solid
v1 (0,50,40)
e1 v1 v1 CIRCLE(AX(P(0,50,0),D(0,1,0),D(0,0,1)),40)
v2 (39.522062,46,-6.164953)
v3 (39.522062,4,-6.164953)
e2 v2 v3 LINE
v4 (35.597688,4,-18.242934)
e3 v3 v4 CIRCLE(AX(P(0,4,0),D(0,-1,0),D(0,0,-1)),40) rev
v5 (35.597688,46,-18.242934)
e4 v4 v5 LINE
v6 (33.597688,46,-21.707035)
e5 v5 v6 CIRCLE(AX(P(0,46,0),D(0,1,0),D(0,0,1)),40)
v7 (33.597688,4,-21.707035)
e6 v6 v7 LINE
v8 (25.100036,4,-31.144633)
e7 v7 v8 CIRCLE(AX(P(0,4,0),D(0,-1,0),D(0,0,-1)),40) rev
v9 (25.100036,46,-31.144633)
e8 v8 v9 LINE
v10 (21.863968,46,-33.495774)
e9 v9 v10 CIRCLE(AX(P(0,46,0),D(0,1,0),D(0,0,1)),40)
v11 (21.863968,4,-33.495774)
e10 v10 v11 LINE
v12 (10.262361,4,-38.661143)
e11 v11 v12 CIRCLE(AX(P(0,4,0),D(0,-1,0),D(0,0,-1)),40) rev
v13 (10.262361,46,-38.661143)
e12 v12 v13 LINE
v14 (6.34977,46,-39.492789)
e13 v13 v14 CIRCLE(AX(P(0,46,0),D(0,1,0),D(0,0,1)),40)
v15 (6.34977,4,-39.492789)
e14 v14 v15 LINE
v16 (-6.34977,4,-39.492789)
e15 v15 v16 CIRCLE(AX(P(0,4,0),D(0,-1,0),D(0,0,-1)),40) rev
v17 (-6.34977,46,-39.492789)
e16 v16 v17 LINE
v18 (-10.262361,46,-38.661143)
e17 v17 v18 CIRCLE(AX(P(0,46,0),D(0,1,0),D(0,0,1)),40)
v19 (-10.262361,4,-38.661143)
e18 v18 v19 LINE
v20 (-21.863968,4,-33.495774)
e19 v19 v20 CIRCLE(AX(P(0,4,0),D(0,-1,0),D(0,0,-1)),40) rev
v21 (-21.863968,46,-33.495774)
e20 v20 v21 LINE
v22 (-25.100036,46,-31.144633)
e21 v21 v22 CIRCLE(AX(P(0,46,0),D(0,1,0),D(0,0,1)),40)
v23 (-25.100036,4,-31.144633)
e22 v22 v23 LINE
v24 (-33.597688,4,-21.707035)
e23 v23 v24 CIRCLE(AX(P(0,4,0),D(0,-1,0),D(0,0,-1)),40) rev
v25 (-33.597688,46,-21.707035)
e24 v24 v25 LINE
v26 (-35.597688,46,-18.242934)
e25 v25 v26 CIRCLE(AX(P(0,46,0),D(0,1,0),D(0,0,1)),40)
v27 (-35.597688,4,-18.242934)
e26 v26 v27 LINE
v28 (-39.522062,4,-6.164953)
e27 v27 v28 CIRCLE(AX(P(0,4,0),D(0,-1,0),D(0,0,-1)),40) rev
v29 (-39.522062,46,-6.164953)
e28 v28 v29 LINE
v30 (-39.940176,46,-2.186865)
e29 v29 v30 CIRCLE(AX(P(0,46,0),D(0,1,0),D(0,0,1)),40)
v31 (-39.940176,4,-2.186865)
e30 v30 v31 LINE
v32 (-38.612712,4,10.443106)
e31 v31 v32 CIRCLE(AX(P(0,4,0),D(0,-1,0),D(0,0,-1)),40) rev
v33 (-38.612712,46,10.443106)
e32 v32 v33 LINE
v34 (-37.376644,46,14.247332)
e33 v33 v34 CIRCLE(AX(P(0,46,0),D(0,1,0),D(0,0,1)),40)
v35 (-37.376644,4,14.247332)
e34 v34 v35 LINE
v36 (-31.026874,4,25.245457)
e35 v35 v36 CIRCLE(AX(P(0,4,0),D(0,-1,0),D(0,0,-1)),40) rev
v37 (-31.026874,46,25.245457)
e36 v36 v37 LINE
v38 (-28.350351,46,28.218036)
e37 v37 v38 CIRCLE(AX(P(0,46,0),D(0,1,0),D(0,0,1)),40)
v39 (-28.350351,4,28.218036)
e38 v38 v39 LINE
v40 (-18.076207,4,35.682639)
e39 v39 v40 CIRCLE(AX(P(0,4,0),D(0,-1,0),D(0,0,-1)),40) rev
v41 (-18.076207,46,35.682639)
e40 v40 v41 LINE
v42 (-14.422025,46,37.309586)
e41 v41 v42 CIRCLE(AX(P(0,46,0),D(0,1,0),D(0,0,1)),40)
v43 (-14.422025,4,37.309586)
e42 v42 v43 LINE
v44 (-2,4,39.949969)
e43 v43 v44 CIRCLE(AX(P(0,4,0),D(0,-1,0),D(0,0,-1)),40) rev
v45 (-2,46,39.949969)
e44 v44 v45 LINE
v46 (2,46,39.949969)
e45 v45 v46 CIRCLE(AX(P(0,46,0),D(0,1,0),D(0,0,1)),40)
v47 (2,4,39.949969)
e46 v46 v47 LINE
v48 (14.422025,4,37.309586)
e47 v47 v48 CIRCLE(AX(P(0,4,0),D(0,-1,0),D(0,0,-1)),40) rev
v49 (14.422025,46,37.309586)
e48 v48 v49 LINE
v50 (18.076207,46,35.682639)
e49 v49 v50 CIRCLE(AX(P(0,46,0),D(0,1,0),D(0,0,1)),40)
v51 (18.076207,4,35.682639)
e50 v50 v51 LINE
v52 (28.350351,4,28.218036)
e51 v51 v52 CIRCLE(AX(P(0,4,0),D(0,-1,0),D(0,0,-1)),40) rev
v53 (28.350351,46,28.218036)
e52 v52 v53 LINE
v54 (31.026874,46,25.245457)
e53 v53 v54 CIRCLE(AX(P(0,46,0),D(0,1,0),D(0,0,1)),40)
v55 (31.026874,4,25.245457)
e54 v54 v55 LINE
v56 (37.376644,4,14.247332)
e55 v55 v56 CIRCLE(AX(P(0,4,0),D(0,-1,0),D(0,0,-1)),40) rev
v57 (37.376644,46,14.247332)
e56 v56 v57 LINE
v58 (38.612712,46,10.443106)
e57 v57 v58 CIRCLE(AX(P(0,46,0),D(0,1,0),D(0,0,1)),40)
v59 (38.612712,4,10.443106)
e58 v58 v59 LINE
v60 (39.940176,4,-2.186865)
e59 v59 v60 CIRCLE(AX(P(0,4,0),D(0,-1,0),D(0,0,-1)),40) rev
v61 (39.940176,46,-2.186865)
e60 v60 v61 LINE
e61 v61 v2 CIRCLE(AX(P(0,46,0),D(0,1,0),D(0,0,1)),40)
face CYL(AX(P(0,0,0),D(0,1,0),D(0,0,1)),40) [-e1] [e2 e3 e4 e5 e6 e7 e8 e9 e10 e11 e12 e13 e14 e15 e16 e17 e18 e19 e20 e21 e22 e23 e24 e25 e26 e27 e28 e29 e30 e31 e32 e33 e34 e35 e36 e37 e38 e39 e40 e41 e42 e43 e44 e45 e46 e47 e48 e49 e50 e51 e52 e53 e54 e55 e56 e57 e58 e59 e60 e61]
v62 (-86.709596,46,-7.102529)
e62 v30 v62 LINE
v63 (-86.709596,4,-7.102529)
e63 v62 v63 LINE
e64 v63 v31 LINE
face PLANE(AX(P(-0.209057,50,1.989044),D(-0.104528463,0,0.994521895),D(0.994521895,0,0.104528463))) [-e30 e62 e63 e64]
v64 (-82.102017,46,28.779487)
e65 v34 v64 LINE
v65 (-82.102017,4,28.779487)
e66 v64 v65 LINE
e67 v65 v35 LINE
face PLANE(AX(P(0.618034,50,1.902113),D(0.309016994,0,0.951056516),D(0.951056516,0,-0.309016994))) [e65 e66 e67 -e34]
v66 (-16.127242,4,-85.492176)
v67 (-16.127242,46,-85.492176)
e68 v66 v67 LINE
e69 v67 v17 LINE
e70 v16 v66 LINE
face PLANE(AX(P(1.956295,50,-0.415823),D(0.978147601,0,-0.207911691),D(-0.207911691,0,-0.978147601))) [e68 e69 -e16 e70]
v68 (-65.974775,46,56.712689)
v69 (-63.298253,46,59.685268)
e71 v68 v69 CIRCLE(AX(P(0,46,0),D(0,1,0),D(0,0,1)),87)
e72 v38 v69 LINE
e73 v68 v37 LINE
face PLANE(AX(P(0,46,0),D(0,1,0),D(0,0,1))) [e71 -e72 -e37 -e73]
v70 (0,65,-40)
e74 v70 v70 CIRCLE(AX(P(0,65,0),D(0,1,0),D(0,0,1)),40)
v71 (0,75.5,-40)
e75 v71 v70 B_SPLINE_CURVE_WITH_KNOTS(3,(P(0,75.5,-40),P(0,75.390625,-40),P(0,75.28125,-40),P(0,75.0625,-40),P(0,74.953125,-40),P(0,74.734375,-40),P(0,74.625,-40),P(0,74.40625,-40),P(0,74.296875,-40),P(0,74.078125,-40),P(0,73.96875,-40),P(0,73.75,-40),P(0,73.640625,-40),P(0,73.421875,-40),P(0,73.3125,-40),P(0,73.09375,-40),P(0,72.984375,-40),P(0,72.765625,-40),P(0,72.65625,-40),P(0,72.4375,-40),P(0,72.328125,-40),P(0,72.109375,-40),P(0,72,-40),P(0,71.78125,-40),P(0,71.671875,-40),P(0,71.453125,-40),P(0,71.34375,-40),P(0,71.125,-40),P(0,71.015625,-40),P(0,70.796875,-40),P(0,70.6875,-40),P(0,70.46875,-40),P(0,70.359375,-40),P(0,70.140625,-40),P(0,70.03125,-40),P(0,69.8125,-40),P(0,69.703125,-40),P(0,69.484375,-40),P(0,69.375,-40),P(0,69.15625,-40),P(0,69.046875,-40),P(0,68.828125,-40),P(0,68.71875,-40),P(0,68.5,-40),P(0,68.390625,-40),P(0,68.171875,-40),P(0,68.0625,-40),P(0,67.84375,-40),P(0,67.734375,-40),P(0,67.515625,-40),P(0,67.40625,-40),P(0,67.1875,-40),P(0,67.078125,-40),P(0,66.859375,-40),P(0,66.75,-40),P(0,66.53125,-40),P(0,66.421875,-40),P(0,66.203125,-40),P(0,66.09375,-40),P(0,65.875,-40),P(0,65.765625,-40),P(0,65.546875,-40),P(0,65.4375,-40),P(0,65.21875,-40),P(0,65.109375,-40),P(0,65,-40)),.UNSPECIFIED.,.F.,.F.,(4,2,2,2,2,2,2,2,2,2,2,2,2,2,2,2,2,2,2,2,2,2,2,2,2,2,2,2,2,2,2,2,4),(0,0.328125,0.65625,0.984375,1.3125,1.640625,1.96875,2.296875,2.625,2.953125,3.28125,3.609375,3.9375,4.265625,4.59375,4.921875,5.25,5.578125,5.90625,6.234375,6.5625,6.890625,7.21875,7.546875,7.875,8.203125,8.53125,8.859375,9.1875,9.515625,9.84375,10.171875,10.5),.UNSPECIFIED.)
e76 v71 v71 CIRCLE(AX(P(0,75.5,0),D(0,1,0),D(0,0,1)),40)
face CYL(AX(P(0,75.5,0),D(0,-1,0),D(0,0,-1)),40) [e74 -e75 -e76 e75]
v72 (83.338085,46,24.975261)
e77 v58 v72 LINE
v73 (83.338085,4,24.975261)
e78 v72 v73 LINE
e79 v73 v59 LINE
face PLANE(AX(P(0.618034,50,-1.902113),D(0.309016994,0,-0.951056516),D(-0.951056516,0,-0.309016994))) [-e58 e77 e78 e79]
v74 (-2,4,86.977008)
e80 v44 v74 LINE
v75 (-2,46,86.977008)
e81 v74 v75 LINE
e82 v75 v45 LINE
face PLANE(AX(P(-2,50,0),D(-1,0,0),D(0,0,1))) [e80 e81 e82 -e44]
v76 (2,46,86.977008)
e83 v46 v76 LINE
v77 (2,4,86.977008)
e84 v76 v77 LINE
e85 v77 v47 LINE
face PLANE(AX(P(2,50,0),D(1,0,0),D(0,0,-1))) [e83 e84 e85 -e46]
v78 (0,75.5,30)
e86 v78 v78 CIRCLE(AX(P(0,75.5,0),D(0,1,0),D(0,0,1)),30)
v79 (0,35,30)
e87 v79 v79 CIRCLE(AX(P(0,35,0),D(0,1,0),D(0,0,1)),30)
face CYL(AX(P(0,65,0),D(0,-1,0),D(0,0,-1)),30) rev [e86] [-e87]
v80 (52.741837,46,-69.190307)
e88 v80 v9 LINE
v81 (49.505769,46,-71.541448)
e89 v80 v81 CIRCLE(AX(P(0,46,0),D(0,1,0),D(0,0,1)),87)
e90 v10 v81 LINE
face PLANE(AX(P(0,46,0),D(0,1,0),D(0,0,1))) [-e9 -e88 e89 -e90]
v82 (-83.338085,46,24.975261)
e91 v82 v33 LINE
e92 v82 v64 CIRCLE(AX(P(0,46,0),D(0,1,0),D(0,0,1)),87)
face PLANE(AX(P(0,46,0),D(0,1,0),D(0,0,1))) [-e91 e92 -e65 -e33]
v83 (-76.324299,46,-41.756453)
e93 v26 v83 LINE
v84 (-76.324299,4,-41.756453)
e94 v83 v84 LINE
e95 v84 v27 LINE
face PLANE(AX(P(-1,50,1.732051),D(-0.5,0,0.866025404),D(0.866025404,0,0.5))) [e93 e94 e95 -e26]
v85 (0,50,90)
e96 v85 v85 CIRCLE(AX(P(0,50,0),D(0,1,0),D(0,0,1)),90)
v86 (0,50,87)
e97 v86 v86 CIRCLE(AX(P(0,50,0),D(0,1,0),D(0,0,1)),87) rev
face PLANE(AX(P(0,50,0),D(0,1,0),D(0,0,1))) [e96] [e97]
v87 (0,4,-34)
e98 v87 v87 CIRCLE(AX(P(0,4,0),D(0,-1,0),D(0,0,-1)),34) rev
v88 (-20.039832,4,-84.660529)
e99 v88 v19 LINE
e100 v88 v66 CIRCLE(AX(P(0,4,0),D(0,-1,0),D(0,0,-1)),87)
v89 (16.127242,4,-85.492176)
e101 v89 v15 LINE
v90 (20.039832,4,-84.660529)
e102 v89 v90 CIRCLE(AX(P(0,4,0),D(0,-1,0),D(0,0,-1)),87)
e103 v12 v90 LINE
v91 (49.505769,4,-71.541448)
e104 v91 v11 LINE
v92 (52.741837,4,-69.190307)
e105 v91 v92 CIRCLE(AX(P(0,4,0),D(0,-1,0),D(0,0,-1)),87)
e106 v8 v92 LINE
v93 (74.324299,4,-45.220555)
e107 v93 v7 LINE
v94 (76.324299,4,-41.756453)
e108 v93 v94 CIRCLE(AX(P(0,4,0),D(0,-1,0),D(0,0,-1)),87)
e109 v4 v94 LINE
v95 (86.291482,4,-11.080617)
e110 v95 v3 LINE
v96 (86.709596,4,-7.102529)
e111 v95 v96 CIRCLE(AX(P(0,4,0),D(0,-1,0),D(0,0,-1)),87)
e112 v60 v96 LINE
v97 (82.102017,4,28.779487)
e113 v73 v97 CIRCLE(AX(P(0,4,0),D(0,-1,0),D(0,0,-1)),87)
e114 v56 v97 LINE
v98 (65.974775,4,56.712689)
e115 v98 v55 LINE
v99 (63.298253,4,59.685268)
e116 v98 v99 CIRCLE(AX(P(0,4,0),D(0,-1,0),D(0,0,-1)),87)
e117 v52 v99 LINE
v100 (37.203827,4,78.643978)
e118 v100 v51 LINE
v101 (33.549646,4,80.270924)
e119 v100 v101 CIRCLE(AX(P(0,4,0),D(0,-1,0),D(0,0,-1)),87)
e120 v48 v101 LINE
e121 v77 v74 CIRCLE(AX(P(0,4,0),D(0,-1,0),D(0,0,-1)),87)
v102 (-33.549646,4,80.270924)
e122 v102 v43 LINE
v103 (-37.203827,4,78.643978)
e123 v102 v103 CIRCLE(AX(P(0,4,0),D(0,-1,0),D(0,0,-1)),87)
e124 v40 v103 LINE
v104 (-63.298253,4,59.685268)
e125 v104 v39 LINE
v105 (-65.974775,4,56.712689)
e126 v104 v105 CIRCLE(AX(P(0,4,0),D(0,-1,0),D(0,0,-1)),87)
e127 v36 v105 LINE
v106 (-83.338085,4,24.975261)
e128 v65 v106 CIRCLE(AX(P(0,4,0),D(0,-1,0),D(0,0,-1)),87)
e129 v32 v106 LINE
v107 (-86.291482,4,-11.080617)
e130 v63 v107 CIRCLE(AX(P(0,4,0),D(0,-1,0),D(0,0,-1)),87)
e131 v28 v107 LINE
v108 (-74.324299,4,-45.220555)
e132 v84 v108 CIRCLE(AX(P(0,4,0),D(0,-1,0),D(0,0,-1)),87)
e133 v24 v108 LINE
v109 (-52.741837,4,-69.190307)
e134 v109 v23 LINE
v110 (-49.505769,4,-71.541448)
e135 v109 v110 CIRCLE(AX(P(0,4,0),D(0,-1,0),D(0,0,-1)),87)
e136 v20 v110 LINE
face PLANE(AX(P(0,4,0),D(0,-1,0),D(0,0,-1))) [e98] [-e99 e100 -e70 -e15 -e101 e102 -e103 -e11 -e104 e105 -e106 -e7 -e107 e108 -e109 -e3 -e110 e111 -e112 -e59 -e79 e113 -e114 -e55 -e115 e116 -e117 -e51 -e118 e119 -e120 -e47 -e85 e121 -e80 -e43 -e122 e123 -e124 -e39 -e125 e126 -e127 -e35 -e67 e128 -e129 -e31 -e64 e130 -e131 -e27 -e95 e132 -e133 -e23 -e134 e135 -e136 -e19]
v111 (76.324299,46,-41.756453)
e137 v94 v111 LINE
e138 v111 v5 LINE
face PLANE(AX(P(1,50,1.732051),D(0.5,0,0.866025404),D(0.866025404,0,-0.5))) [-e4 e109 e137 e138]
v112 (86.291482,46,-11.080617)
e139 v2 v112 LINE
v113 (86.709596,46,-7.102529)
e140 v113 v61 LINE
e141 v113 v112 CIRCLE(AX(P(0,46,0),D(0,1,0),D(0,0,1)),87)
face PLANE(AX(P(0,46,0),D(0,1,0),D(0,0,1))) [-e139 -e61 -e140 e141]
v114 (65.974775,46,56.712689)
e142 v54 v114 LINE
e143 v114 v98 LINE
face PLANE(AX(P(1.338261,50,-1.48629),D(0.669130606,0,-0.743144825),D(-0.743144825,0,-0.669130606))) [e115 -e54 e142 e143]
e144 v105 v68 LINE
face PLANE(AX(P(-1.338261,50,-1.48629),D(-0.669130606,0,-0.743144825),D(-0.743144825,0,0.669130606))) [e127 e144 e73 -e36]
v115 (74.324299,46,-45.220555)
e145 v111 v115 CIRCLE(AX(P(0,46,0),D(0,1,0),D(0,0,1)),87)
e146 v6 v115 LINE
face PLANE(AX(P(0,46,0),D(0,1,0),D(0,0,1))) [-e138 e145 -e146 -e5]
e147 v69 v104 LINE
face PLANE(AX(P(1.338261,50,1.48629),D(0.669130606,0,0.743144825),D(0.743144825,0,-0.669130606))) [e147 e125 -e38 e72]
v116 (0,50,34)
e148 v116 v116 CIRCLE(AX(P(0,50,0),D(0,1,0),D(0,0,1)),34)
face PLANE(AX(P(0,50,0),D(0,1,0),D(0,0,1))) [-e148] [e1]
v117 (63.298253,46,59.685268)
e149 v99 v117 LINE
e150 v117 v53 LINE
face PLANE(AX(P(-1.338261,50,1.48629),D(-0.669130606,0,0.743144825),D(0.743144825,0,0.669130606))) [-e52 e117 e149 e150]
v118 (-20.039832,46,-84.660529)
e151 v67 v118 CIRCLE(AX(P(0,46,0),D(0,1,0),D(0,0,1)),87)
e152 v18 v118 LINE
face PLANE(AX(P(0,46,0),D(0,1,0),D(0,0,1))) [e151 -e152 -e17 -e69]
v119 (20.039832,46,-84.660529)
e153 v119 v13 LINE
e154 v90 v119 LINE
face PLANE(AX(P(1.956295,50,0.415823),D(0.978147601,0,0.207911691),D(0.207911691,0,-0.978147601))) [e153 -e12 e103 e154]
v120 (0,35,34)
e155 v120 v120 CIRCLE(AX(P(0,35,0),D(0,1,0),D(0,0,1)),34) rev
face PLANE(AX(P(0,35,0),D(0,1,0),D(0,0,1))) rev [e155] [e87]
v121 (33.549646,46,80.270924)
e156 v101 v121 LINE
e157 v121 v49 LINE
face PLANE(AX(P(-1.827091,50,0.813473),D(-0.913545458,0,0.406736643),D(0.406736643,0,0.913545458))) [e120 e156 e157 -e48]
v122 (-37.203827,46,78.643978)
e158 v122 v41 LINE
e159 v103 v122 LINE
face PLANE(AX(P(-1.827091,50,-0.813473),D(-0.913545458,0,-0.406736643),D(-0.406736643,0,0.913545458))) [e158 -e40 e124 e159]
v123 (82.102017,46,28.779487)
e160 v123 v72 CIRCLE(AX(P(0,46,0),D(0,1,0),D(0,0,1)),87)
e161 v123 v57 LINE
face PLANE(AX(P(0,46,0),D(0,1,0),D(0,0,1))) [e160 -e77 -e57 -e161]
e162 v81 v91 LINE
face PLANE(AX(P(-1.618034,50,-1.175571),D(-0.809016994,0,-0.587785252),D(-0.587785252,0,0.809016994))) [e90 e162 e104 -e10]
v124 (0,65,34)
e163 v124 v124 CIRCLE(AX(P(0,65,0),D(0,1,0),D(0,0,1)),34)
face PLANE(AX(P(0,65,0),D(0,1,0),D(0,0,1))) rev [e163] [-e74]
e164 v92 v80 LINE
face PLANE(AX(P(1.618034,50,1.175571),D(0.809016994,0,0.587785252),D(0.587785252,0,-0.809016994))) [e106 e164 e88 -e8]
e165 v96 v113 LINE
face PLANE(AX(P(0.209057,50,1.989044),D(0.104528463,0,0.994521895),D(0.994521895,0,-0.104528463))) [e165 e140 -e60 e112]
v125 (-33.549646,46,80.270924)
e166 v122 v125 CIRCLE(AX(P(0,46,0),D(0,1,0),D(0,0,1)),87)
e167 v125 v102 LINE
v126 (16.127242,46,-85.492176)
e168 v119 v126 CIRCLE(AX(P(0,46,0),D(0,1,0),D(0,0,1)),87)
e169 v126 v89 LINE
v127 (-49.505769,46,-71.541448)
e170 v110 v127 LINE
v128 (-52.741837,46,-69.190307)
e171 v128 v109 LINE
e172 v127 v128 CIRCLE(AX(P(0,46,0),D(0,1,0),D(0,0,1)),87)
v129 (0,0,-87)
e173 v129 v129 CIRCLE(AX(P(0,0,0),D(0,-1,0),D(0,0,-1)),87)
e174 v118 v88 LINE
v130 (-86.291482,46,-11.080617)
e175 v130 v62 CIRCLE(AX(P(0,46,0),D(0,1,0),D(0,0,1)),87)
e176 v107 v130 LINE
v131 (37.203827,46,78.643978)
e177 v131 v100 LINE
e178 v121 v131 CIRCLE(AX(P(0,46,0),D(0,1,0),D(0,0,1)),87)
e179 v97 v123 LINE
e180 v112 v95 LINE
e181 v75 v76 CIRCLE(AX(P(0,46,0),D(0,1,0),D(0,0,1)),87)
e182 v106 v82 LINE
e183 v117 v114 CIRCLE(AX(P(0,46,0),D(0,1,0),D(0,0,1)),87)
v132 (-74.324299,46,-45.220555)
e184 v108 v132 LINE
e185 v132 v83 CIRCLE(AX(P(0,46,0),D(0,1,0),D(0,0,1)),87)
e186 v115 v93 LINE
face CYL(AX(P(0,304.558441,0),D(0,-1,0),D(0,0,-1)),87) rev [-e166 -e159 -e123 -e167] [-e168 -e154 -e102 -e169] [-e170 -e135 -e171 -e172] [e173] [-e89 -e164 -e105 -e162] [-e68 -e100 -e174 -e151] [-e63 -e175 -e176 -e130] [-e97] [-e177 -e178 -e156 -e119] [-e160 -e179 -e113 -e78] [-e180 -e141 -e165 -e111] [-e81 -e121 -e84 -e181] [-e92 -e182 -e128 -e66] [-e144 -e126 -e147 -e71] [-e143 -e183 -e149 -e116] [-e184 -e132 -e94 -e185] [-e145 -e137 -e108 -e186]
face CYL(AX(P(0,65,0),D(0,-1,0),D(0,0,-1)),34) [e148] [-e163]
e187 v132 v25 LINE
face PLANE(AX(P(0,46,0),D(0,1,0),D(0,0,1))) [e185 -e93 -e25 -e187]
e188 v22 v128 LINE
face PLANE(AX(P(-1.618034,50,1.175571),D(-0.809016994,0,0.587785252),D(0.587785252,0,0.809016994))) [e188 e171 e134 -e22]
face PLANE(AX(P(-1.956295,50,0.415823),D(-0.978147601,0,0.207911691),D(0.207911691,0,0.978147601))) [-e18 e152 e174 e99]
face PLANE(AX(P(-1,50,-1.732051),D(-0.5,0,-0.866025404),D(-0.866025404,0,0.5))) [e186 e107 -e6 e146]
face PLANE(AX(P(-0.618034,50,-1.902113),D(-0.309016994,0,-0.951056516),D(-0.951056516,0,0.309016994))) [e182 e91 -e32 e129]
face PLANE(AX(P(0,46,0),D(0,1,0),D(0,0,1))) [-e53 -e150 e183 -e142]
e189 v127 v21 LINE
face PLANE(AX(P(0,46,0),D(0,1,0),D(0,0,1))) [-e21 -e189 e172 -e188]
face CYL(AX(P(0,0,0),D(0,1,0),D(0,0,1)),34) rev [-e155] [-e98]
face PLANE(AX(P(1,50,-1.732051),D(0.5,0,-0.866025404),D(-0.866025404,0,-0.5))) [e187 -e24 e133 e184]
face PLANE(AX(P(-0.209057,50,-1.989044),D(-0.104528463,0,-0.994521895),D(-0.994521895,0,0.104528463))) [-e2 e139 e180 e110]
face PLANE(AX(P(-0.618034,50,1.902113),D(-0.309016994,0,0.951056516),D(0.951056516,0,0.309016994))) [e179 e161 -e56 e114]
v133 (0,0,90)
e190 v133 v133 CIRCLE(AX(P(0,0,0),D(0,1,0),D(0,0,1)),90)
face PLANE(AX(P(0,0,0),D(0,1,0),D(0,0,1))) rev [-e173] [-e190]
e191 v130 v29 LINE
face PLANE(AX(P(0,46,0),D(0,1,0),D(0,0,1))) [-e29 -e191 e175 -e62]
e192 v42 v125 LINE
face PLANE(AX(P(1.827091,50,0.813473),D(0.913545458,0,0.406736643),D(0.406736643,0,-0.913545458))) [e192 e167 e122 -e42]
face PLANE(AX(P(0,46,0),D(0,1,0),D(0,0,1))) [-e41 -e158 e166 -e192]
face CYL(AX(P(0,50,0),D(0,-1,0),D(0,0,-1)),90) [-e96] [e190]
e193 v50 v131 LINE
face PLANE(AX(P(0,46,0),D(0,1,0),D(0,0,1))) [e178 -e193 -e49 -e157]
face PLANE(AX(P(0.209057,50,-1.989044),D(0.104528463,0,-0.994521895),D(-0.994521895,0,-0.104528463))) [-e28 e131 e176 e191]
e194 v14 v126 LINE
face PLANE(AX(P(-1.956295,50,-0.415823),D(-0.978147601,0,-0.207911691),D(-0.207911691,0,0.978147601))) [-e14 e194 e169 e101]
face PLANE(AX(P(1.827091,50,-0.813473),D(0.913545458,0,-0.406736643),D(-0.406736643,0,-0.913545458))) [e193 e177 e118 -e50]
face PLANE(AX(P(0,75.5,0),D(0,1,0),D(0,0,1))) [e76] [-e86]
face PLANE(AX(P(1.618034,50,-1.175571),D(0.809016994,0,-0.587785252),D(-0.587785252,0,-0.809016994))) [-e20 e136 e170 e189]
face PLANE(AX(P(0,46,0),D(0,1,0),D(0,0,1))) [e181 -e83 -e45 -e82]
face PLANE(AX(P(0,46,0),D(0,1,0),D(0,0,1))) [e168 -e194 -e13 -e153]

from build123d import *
from build123d.topology import SkipClean

# Parameters (mm, degrees)
SKETCH1_R                = 90
BOSS_EXTRUDE1_DEPTH      = 50
CUT_EXTRUDE1_DEPTH       = 50
SKETCH4_R                = 40
CUT_EXTRUDE2_DEPTH       = 137.546695512
SKETCH5_R                = 40
SKETCH5_R_2              = 34
BOSS_EXTRUDE2_DEPTH      = 50
BOSS_EXTRUDE3_DEPTH      = 15
BOSS_EXTRUDE3_DEPTH_BACK = 15
SKETCH9_R                = 34
SKETCH9_R_2              = 30
SKETCH10_R               = 40
SKETCH10_R_2             = 30
BOSS_EXTRUDE4_DEPTH      = 10.5
SKETCH11_R               = 90
SKETCH11_R_2             = 87
BOSS_EXTRUDE5_DEPTH      = 50
SKETCH12_R               = 87
SKETCH12_R_2             = 40
CUT_EXTRUDE3_DEPTH       = 4
SKETCH13_R               = 87
CUT_EXTRUDE4_DEPTH       = 4


with BuildPart() as part:
    # Sketch1 → Boss-Extrude1 (new body)
    with BuildSketch(Plane(origin=(0, 0, 0), x_dir=(1, 0, 0), z_dir=(0, 1, 0))):
        with Locations(Location((0, 0, 0), (0, 0, 270))):
            Circle(SKETCH1_R)
    extrude(amount=BOSS_EXTRUDE1_DEPTH)

    # Sketch2 → Cut-Extrude1 (cut)
    with BuildSketch(Plane.XZ):
        with BuildLine():
            Line((-2, 9.409260219), (-2, 89.977775034))
            ThreePointArc((-2, 89.977775034), (-18.712052174, 88.033284066), (-34.770167253, 83.012260957))
            Line((-34.770167253, 83.012260957), (-2, 9.409260219))
        make_face()
        with BuildLine():
            ThreePointArc((34.770167253, 83.012260957), (18.712052174, 88.033284066), (2, 89.977775034))
            Line((2, 89.977775034), (2, 9.409260219))
            Line((2, 9.409260219), (34.770167253, 83.012260957))
        make_face()
        with BuildLine():
            Line((-5.654181831, 7.782313647), (-38.424349084, 81.385314385))
            ThreePointArc((-38.424349084, 81.385314385), (-52.900672706, 72.811529494), (-65.528256711, 61.693172818))
            Line((-65.528256711, 61.693172818), (-5.654181831, 7.782313647))
        make_face()
        with BuildLine():
            ThreePointArc((65.528256711, 61.693172818), (52.900672706, 72.811529494), (38.424349084, 81.385314385))
            Line((38.424349084, 81.385314385), (5.654181831, 7.782313647))
            Line((5.654181831, 7.782313647), (65.528256711, 61.693172818))
        make_face()
        with BuildLine():
            Line((-8.330704256, 4.809734345), (-68.204779137, 58.720593516))
            ThreePointArc((-68.204779137, 58.720593516), (-77.942286341, 45), (-84.955915279, 29.706774634))
            Line((-84.955915279, 29.706774634), (-8.330704256, 4.809734345))
        make_face()
        with BuildLine():
            ThreePointArc((84.955915279, 29.706774634), (77.942286341, 45), (68.204779137, 58.720593516))
            Line((68.204779137, 58.720593516), (8.330704256, 4.809734345))
            Line((8.330704256, 4.809734345), (84.955915279, 29.706774634))
        make_face()
        with BuildLine():
            Line((-9.566772234, 1.00550828), (-86.191983256, 25.902548569))
            ThreePointArc((-86.191983256, 25.902548569), (-89.506970583, 9.407561694), (-89.693924294, -7.416194762))
            Line((-89.693924294, -7.416194762), (-9.566772234, 1.00550828))
        make_face()
        with BuildLine():
            ThreePointArc((89.693924294, -7.416194762), (89.506970583, 9.407561694), (86.191983256, 25.902548569))
            Line((86.191983256, 25.902548569), (9.566772234, 1.00550828))
            Line((9.566772234, 1.00550828), (89.693924294, -7.416194762))
        make_face()
        with BuildLine():
            Line((-9.14865838, -2.972579302), (-89.275810441, -11.394282343))
            ThreePointArc((-89.275810441, -11.394282343), (-85.595086467, -27.811529494), (-78.923038955, -43.256836709))
            Line((-78.923038955, -43.256836709), (-9.14865838, -2.972579302))
        make_face()
        with BuildLine():
            Line((89.275810441, -11.394282343), (9.14865838, -2.972579302))
            Line((9.14865838, -2.972579302), (78.923038955, -43.256836709))
            ThreePointArc((78.923038955, -43.256836709), (85.595086467, -27.811529494), (89.275810441, -11.394282343))
        make_face()
        with BuildLine():
            Line((-7.14865838, -6.436680917), (-76.923038955, -46.720938324))
            ThreePointArc((-76.923038955, -46.720938324), (-66.883034293, -60.221754572), (-54.505643188, -71.617978614))
            Line((-54.505643188, -71.617978614), (-7.14865838, -6.436680917))
        make_face()
        with BuildLine():
            Line((76.923038955, -46.720938324), (7.14865838, -6.436680917))
            Line((7.14865838, -6.436680917), (54.505643188, -71.617978614))
            ThreePointArc((54.505643188, -71.617978614), (66.883034293, -60.221754572), (76.923038955, -46.720938324))
        make_face()
        with BuildLine():
            Line((-3.912590403, -8.787821926), (-51.26957521, -73.969119623))
            ThreePointArc((-51.26957521, -73.969119623), (-36.606297877, -82.219091188), (-20.663726545, -87.595721387))
            Line((-20.663726545, -87.595721387), (-3.912590403, -8.787821926))
        make_face()
        with BuildLine():
            Line((51.26957521, -73.969119623), (3.912590403, -8.787821926))
            Line((3.912590403, -8.787821926), (20.663726545, -87.595721387))
            ThreePointArc((20.663726545, -87.595721387), (36.606297877, -82.219091188), (51.26957521, -73.969119623))
        make_face()
        with BuildLine():
            Line((0, -9.619468689), (-16.751136142, -88.42736815))
            ThreePointArc((-16.751136142, -88.42736815), (0, -90), (16.751136142, -88.42736815))
            Line((16.751136142, -88.42736815), (0, -9.619468689))
        make_face()
    extrude(amount=-CUT_EXTRUDE1_DEPTH, mode=Mode.SUBTRACT)

    # Sketch4 → Cut-Extrude2 (cut, through all)
    with BuildSketch(Plane(origin=(0, 50, 0), x_dir=(1, 0, 0), z_dir=(0, 1, 0))):
        Circle(SKETCH4_R)
    extrude(amount=-CUT_EXTRUDE2_DEPTH, mode=Mode.SUBTRACT)


with BuildPart() as cut_extrude2_piece_1:
    # of the separate pieces the step leaves, piece 1, a body of its own (cut_extrude2_pieces)
    add(part.part.solids().sort_by_distance((-84.955915279, 0, 29.706774634))[0])


with BuildPart() as cut_extrude2_piece_2:
    # of the separate pieces the step leaves, piece 2, a body of its own (cut_extrude2_pieces)
    add(part.part.solids().sort_by_distance((-65.528256711, 0, 61.693172818))[0])


with BuildPart() as cut_extrude2_piece_3:
    # of the separate pieces the step leaves, piece 3, a body of its own (cut_extrude2_pieces)
    add(part.part.solids().sort_by_distance((10.262360744, 0, -38.661142662))[0])


with BuildPart() as cut_extrude2_piece_4:
    # of the separate pieces the step leaves, piece 4, a body of its own (cut_extrude2_pieces)
    add(part.part.solids().sort_by_distance((14.422025249, 0, 37.309585735))[0])


with BuildPart() as cut_extrude2_piece_5:
    # of the separate pieces the step leaves, piece 5, a body of its own (cut_extrude2_pieces)
    add(part.part.solids().sort_by_distance((-2, 0, 89.977775034))[0])


with BuildPart() as cut_extrude2_piece_6:
    # of the separate pieces the step leaves, piece 6, a body of its own (cut_extrude2_pieces)
    add(part.part.solids().sort_by_distance((39.940175529, 0, -2.186865046))[0])


with BuildPart() as cut_extrude2_piece_7:
    # of the separate pieces the step leaves, piece 7, a body of its own (cut_extrude2_pieces)
    add(part.part.solids().sort_by_distance((25.100036427, 0, -31.144633107))[0])


with BuildPart() as cut_extrude2_piece_8:
    # of the separate pieces the step leaves, piece 8, a body of its own (cut_extrude2_pieces)
    add(part.part.solids().sort_by_distance((-34.770167253, 0, 83.012260957))[0])


with BuildPart() as cut_extrude2_piece_9:
    # of the separate pieces the step leaves, piece 9, a body of its own (cut_extrude2_pieces)
    add(part.part.solids().sort_by_distance((28.350351313, 0, 28.218036438))[0])


with BuildPart() as cut_extrude2_piece_10:
    # of the separate pieces the step leaves, piece 10, a body of its own (cut_extrude2_pieces)
    add(part.part.solids().sort_by_distance((-20.663726545, 0, -87.595721387))[0])


with BuildPart() as cut_extrude2_piece_11:
    # of the separate pieces the step leaves, piece 11, a body of its own (cut_extrude2_pieces)
    add(part.part.solids().sort_by_distance((-54.505643188, 0, -71.617978614))[0])


with BuildPart() as cut_extrude2_piece_12:
    # of the separate pieces the step leaves, piece 12, a body of its own (cut_extrude2_pieces)
    add(part.part.solids().sort_by_distance((37.37664408, 0, 14.247332289))[0])


with BuildPart() as cut_extrude2_piece_13:
    # of the separate pieces the step leaves, piece 13, a body of its own (cut_extrude2_pieces)
    add(part.part.solids().sort_by_distance((35.597687784, 0, -18.242933548))[0])


with BuildPart() as cut_extrude2_piece_14:
    # of the separate pieces the step leaves, piece 14, a body of its own (cut_extrude2_pieces)
    add(part.part.solids().sort_by_distance((-89.693924294, 0, -7.416194762))[0])


with BuildPart() as cut_extrude2_piece_15:
    # of the separate pieces the step leaves, piece 15, a body of its own (cut_extrude2_pieces)
    add(part.part.solids().sort_by_distance((-78.923038955, 0, -43.256836709))[0])


with BuildPart() as body_16:
    # Sketch5 → Boss-Extrude2 (new body)
    with BuildSketch(Plane(origin=(0, 50, 0), x_dir=(1, 0, 0), z_dir=(0, 1, 0))):
        with Locations(Location((0, 0, 0), (0, 0, 270))):
            Circle(SKETCH5_R)
        with Locations(Location((0, 0, 0), (0, 0, 270))):
            Circle(SKETCH5_R_2, mode=Mode.SUBTRACT)
    extrude(amount=-BOSS_EXTRUDE2_DEPTH)



with BuildPart() as body_17:
    # Sketch9 → Boss-Extrude3 (new, two sides: drawn at the far end of the back side and taken through both)
    with BuildSketch(Plane(origin=(0, 50, 0), x_dir=(1, 0, 0), z_dir=(0, 1, 0)).offset(-BOSS_EXTRUDE3_DEPTH_BACK)):
        with Locations(Location((0, 0, 0), (0, 0, 270))):
            Circle(SKETCH9_R)
        with Locations(Location((0, 0, 0), (0, 0, 270))):
            Circle(SKETCH9_R_2, mode=Mode.SUBTRACT)
    extrude(amount=BOSS_EXTRUDE3_DEPTH + BOSS_EXTRUDE3_DEPTH_BACK)

    # Sketch10 → Boss-Extrude4 (add)
    with BuildSketch(Plane(origin=(0, 65, 0), x_dir=(1, 0, 0), z_dir=(0, 1, 0))):
        with Locations(Location((0, 0, 0), (0, 0, 270))):
            Circle(SKETCH10_R)
        with Locations(Location((0, 0, 0), (0, 0, 270))):
            Circle(SKETCH10_R_2, mode=Mode.SUBTRACT)
    extrude(amount=BOSS_EXTRUDE4_DEPTH)


with BuildPart() as body_16_1:
    add(body_16.part)

    add(body_17.part)  # Boss-Extrude5 merges body 17

    add(cut_extrude2_piece_3.part)  # Boss-Extrude5 merges Cut-Extrude2 piece 3

    add(cut_extrude2_piece_7.part)  # Boss-Extrude5 merges Cut-Extrude2 piece 7

    add(cut_extrude2_piece_14.part)  # Boss-Extrude5 merges Cut-Extrude2 piece 14

    add(cut_extrude2_piece_15.part)  # Boss-Extrude5 merges Cut-Extrude2 piece 15

    add(cut_extrude2_piece_11.part)  # Boss-Extrude5 merges Cut-Extrude2 piece 11

    add(cut_extrude2_piece_5.part)  # Boss-Extrude5 merges Cut-Extrude2 piece 5

    add(cut_extrude2_piece_1.part)  # Boss-Extrude5 merges Cut-Extrude2 piece 1

    add(cut_extrude2_piece_8.part)  # Boss-Extrude5 merges Cut-Extrude2 piece 8

    add(cut_extrude2_piece_2.part)  # Boss-Extrude5 merges Cut-Extrude2 piece 2

    add(cut_extrude2_piece_13.part)  # Boss-Extrude5 merges Cut-Extrude2 piece 13

    add(cut_extrude2_piece_6.part)  # Boss-Extrude5 merges Cut-Extrude2 piece 6

    add(cut_extrude2_piece_4.part)  # Boss-Extrude5 merges Cut-Extrude2 piece 4

    add(cut_extrude2_piece_12.part)  # Boss-Extrude5 merges Cut-Extrude2 piece 12

    add(cut_extrude2_piece_9.part)  # Boss-Extrude5 merges Cut-Extrude2 piece 9

    add(cut_extrude2_piece_10.part)  # Boss-Extrude5 merges Cut-Extrude2 piece 10
    # Sketch11 → Boss-Extrude5 (add)
    with BuildSketch(Plane.XZ):
        with Locations(Location((0, 0, 0), (0, 0, 90))):
            Circle(SKETCH11_R)
        Circle(SKETCH11_R_2, mode=Mode.SUBTRACT)
    extrude(amount=-BOSS_EXTRUDE5_DEPTH)

    # Sketch12 → Cut-Extrude3 (cut)
    with SkipClean():  # the faces are left unmerged after this step: merging them gives an invalid solid
        with BuildSketch(Plane(origin=(0, 50, 0), x_dir=(1, 0, 0), z_dir=(0, 1, 0))):
            with Locations(Location((0, 0, 0), (0, 0, 100.682739604))):
                Circle(SKETCH12_R)
            with Locations(Location((0, 0, 0), (0, 0, 270))):
                Circle(SKETCH12_R_2, mode=Mode.SUBTRACT)
        extrude(amount=-CUT_EXTRUDE3_DEPTH, mode=Mode.SUBTRACT)
    add(body_16_1.part.scale(1), mode=Mode.REPLACE)  # the faces are merged on a copy

    # Sketch13 → Cut-Extrude4 (cut)
    with SkipClean():  # the faces are left unmerged after this step: merging them gives an invalid solid
        with BuildSketch(Plane.XZ):
            with Locations(Location((0, 0, 0), (0, 0, 270))):
                Circle(SKETCH13_R)
        extrude(amount=-CUT_EXTRUDE4_DEPTH, mode=Mode.SUBTRACT)


solid = body_16_1.part
